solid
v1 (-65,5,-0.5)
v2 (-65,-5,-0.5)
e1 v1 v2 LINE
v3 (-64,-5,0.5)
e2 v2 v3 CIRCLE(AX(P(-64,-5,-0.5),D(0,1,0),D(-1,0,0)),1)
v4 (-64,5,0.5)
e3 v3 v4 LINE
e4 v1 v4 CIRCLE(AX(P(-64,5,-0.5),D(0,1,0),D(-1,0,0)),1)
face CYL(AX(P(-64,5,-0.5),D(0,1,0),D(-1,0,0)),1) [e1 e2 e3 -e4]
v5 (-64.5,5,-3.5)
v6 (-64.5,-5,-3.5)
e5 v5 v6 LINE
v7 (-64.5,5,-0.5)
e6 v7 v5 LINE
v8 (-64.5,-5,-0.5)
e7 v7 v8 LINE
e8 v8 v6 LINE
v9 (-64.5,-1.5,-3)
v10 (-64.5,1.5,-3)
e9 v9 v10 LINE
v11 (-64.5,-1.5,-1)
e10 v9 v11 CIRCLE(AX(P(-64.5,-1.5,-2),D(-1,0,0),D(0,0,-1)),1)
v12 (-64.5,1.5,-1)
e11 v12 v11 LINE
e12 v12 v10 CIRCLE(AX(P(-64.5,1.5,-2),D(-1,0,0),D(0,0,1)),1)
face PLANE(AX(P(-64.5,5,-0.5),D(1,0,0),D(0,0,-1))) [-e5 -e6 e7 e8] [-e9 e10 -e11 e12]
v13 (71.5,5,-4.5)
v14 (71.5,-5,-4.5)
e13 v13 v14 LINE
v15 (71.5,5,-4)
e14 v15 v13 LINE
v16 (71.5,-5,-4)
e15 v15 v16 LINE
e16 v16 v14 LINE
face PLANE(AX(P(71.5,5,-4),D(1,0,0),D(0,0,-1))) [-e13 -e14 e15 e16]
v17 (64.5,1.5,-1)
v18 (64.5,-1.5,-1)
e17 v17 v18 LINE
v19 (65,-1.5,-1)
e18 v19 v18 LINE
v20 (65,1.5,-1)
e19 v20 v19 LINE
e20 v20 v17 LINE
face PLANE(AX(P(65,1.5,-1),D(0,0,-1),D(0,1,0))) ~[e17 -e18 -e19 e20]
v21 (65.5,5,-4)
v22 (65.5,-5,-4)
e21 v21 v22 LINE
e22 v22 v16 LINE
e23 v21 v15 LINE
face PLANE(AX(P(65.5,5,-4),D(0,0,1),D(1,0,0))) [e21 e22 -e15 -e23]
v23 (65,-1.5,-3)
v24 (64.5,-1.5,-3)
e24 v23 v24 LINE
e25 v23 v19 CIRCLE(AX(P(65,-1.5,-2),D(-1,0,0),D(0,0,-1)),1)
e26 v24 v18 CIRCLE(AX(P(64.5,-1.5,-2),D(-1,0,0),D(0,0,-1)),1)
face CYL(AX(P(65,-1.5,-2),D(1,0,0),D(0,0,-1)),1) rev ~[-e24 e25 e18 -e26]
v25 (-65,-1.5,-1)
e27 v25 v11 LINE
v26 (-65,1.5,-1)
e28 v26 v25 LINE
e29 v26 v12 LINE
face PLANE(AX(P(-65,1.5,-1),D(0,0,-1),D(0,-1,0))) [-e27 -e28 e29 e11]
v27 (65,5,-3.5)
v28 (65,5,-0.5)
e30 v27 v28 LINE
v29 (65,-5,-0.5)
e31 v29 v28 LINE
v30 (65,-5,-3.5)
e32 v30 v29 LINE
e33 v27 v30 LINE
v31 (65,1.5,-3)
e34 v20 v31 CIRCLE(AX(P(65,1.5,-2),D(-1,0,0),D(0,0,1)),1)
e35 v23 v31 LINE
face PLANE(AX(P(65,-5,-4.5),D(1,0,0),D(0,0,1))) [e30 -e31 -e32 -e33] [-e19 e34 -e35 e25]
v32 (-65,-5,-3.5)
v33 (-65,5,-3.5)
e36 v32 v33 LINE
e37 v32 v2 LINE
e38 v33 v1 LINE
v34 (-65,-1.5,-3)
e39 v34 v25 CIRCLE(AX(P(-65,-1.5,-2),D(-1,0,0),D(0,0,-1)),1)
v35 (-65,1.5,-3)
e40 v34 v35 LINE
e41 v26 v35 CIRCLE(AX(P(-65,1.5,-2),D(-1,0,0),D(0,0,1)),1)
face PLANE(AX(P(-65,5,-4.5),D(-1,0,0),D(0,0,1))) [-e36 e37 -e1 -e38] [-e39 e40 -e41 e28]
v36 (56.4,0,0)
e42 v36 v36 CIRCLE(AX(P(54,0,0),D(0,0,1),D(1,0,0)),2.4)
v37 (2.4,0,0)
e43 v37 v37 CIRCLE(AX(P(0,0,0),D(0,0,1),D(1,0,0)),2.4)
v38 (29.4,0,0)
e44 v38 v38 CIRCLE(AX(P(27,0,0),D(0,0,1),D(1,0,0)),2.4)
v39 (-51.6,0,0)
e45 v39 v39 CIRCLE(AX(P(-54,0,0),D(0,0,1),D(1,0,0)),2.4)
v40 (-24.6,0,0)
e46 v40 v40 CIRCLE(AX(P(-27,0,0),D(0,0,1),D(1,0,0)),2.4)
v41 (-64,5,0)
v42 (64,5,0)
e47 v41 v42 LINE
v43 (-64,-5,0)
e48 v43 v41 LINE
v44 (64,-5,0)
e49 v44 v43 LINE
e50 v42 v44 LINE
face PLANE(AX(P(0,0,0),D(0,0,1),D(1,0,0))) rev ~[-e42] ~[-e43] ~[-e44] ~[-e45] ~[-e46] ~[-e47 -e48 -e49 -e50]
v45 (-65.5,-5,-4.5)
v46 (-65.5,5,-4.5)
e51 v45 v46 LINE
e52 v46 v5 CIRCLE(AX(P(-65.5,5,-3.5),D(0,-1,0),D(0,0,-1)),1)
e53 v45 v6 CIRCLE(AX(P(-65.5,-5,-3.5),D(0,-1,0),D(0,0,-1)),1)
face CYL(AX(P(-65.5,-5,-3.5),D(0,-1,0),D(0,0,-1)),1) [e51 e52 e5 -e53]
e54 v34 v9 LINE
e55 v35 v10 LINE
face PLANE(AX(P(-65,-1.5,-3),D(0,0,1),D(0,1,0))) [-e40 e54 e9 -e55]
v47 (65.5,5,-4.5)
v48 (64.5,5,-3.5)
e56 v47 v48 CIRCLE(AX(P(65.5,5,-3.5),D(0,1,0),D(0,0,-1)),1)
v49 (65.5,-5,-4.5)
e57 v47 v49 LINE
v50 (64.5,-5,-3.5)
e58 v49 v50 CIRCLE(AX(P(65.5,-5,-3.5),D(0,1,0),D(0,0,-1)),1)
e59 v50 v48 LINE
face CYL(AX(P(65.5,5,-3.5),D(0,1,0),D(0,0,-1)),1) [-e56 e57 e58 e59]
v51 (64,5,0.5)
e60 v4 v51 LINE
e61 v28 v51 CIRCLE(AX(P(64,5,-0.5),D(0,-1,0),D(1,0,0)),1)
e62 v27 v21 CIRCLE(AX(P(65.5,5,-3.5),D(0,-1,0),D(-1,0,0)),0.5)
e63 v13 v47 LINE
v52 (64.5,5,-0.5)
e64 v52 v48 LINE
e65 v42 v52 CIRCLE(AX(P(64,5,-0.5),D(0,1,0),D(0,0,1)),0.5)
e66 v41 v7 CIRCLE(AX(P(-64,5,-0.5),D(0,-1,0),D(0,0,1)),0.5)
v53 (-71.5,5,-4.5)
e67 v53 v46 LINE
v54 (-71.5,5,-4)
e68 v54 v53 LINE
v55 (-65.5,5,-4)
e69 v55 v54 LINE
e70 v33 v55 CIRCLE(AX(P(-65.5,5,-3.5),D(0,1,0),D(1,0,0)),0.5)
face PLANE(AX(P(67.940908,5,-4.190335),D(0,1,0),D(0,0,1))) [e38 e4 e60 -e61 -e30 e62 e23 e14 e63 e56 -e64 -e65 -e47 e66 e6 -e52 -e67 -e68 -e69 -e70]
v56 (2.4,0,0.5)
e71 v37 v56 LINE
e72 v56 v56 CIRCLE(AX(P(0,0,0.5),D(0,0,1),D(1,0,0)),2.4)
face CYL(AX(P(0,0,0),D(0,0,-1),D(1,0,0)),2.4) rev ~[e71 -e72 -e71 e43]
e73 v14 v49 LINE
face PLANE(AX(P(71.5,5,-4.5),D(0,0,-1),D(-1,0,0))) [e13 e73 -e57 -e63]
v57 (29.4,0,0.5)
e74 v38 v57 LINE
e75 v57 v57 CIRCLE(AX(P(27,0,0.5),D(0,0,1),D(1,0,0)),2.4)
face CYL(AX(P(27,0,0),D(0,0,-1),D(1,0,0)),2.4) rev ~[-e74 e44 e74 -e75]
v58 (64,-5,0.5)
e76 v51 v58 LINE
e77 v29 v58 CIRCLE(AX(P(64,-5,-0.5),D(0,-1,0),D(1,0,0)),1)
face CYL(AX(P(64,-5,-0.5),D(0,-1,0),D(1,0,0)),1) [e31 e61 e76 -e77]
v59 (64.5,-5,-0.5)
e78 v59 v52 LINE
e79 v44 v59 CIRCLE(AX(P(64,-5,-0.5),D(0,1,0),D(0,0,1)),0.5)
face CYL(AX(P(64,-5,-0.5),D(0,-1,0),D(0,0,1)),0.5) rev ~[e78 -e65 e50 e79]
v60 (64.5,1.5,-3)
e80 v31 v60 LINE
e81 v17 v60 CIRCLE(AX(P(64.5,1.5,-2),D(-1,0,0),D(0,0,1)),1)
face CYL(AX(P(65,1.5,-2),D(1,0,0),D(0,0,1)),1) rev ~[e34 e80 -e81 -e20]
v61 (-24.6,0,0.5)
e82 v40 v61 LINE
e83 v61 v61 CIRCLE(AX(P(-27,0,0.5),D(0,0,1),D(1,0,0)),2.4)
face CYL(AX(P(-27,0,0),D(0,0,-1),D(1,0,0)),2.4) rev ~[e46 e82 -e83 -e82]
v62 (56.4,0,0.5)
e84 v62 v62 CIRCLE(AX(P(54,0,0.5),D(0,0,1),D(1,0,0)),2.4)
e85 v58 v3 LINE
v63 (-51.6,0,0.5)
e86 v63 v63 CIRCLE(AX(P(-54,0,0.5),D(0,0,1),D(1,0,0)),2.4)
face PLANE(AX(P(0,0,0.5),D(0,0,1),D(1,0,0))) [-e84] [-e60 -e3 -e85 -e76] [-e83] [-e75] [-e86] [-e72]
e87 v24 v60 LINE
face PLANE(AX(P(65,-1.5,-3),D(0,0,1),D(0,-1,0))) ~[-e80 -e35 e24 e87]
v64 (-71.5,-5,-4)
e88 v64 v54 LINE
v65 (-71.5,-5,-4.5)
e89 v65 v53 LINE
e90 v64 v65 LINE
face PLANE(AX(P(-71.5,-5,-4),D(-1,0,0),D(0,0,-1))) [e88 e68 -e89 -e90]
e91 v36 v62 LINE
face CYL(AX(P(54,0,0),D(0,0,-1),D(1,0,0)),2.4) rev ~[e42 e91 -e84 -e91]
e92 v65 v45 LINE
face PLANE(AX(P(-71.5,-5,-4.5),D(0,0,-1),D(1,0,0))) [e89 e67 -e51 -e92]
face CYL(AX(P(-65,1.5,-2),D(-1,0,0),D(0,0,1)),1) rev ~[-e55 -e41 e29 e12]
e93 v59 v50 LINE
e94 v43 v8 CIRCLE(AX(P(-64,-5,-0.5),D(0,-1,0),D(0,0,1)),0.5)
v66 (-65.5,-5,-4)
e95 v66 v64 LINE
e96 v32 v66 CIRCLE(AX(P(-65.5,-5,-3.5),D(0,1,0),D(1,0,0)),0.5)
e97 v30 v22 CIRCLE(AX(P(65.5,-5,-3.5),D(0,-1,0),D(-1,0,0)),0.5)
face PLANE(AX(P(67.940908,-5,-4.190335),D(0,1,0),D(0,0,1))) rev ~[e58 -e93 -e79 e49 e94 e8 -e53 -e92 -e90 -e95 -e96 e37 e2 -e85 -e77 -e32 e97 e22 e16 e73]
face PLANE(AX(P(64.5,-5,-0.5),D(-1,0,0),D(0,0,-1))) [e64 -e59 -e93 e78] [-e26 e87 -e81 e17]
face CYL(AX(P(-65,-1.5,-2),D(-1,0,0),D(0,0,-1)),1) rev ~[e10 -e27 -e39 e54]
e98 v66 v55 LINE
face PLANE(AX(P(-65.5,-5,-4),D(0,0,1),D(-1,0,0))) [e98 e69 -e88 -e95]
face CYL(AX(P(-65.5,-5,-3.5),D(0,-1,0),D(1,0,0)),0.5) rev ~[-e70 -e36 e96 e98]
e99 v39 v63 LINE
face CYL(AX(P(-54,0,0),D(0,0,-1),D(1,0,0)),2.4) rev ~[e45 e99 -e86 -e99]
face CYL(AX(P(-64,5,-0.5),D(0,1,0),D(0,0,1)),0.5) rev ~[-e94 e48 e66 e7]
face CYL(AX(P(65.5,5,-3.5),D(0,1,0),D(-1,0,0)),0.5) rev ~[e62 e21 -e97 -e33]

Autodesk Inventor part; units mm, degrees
ref_plane "YZ Plane" through (0, 0, 0) normal (1, 0, 0) x (0, 1, 0)
ref_plane "XZ Plane" through (0, 0, 0) normal (0, 1, 0) x (-1, 0, 0)
ref_plane "XY Plane" through (0, 0, 0) normal (0, 0, 1) x (1, 0, 0)
sketch "Sketch1" plane through (0, 0, 0) normal (0, 0, 1) x (1, 0, 0)
  line L0 (-65, 5) -> (65, 5)
  line L1 (65, 5) -> (65, -5)
  line L2 (65, -5) -> (-65, -5)
  line L3 (-65, -5) -> (-65, 5)
  circle A0 centre (0, 0) radius 2.4
  circle A1 centre (-54, 0) radius 2.4
  circle A2 centre (-27, 0) radius 2.4
  circle A3 centre (27, 0) radius 2.4
  circle A4 centre (54, 0) radius 2.4
  line L4 (-65, 0) -> (65, 0) construction
  point P0 (0, 5)
  dimension "d0" = 130
  dimension "d1" = 10
  dimension "d2" = 4.8
  dimension "d3" = 4.8
  dimension "d4" = 4.8
  dimension "d5" = 4.8
  dimension "d6" = 4.8
  dimension "d9" = 27
  dimension "d10" = 27
  dimension "d11" = 27
  dimension "d12" = 27
extrude "Plate1" add sketch "Sketch1" along normal blind 0.5
sketch "Sketch2" plane through (64.5, -5, 0.5) normal (1, 0, 0) x (0, 1, 0)
  line L0 (10, 0) -> (0, 0)
  line L1 (0, 0) -> (0, -5)
  line L2 (0, -5) -> (10, -5)
  line L3 (10, -5) -> (10, 0)
edge flange "Flange1" height 5 angle 90 thickness 0.5 bend radius 0.5 thickness toward (1, 0, 0) relief tear relief width 0.5 relief depth 0.25 corner gap 0.5 corner form 0 edges at (65, 0, 0) (-65, 0, 0) wall of the first edge with corners at (64.5, 5, 0.5) (64.5, -5, 0.5) (64.5, -5, -4.5) (64.5, 5, -4.5)
bend "Bend1"
corner "Corner1"
sketch "Sketch3" plane through (64.5, 5, -4) normal (0, 0, -1) x (-1, 0, 0)
  line L0 (0, -10) -> (0, 0)
  line L1 (0, 0) -> (-7, 0)
  line L2 (-7, 0) -> (-7, -10)
  line L3 (-7, -10) -> (0, -10)
edge flange "Flange2" height 7 angle 90 thickness 0.5 bend radius 0.5 thickness toward (0, 0, -1) relief tear relief width 0.5 relief depth 0.25 corner gap 0.5 corner form 0 edges at (65, 0, -4.5) (-65, 0, -4.5) wall of the first edge with corners at (64.5, -5, -4) (64.5, 5, -4) (71.5, 5, -4) (71.5, -5, -4)
bend "Bend2"
corner "Corner2"
sketch "Sketch4" plane through (-65, -5, -0.5) normal (-1, 0, 0) x (0, 0, 1)
  line L0 (-3, 10) -> (-3, 0) projected
  line L1 (0, 0) -> (0, 10) projected
  line L2 (-3, 10) -> (0, 10) projected
  line L3 (-1.5, 3.5) -> (-1.5, 6.5) construction
  line L4 (-2.5, 3.5) -> (-2.5, 6.5)
  line L5 (-0.5, 6.5) -> (-0.5, 3.5)
  arc A0 (-2.5, 3.5) -> (-0.5, 3.5) centre (-1.5, 3.5) ccw
  arc A1 (-0.5, 6.5) -> (-2.5, 6.5) centre (-1.5, 6.5) ccw
  point P0 (0.5, 5)
  point P1 (-1.5, 5)
  point P2 (-0.5, 5)
  point P3 (0, 5)
  point P4 (-1.5, 7.5)
  point P5 (-1.5, 10)
  dimension "d34" = 2
  dimension "d35" = 5
extrude "Cut1" cut sketch "Sketch4" against normal blind 0.5
mirror "Mirror1" about plane through (0, 0, 0) normal (1, 0, 0) of "Cut1"
equation "\"d36\" = Thickness"
equation "\"d14\" = BendReliefWidth"
equation "\"d15\" = BendReliefDepth"
equation "\"d16\" = MinimumRemnant"
equation "\"d17\" = BendRadius"
equation "\"d20\" = BendRadius"
equation "\"d21\" = CornerReliefSize"
equation "\"d22\" = GapSize"
equation "\"d23\" = JacobiRadiusSize"
equation "\"d24\" = BendReliefWidth"
equation "\"d25\" = BendReliefDepth"
equation "\"d26\" = MinimumRemnant"
equation "\"d27\" = BendRadius"
equation "\"d30\" = BendRadius"
equation "\"d31\" = CornerReliefSize"
equation "\"d32\" = GapSize"
equation "\"d33\" = JacobiRadiusSize"
equation "\"BendRadius\" = Thickness"
equation "\"BendReliefWidth\" = Thickness"
equation "\"BendReliefDepth\" = 0.5 * Thickness"
equation "\"CornerReliefSize\" = 4 * Thickness"
equation "\"MinimumRemnant\" = 2 * Thickness"
equation "\"TransitionRadius\" = BendRadius"
equation "\"JacobiRadiusSize\" = BendRadius"
equation "\"GapSize\" = Thickness"
equation "\"kerf\" = 0.2"
equation "\"d13\" = BendRadius"
equation "\"Thickness\" = 0.5"
properties part number "LEDStripOrigami"
